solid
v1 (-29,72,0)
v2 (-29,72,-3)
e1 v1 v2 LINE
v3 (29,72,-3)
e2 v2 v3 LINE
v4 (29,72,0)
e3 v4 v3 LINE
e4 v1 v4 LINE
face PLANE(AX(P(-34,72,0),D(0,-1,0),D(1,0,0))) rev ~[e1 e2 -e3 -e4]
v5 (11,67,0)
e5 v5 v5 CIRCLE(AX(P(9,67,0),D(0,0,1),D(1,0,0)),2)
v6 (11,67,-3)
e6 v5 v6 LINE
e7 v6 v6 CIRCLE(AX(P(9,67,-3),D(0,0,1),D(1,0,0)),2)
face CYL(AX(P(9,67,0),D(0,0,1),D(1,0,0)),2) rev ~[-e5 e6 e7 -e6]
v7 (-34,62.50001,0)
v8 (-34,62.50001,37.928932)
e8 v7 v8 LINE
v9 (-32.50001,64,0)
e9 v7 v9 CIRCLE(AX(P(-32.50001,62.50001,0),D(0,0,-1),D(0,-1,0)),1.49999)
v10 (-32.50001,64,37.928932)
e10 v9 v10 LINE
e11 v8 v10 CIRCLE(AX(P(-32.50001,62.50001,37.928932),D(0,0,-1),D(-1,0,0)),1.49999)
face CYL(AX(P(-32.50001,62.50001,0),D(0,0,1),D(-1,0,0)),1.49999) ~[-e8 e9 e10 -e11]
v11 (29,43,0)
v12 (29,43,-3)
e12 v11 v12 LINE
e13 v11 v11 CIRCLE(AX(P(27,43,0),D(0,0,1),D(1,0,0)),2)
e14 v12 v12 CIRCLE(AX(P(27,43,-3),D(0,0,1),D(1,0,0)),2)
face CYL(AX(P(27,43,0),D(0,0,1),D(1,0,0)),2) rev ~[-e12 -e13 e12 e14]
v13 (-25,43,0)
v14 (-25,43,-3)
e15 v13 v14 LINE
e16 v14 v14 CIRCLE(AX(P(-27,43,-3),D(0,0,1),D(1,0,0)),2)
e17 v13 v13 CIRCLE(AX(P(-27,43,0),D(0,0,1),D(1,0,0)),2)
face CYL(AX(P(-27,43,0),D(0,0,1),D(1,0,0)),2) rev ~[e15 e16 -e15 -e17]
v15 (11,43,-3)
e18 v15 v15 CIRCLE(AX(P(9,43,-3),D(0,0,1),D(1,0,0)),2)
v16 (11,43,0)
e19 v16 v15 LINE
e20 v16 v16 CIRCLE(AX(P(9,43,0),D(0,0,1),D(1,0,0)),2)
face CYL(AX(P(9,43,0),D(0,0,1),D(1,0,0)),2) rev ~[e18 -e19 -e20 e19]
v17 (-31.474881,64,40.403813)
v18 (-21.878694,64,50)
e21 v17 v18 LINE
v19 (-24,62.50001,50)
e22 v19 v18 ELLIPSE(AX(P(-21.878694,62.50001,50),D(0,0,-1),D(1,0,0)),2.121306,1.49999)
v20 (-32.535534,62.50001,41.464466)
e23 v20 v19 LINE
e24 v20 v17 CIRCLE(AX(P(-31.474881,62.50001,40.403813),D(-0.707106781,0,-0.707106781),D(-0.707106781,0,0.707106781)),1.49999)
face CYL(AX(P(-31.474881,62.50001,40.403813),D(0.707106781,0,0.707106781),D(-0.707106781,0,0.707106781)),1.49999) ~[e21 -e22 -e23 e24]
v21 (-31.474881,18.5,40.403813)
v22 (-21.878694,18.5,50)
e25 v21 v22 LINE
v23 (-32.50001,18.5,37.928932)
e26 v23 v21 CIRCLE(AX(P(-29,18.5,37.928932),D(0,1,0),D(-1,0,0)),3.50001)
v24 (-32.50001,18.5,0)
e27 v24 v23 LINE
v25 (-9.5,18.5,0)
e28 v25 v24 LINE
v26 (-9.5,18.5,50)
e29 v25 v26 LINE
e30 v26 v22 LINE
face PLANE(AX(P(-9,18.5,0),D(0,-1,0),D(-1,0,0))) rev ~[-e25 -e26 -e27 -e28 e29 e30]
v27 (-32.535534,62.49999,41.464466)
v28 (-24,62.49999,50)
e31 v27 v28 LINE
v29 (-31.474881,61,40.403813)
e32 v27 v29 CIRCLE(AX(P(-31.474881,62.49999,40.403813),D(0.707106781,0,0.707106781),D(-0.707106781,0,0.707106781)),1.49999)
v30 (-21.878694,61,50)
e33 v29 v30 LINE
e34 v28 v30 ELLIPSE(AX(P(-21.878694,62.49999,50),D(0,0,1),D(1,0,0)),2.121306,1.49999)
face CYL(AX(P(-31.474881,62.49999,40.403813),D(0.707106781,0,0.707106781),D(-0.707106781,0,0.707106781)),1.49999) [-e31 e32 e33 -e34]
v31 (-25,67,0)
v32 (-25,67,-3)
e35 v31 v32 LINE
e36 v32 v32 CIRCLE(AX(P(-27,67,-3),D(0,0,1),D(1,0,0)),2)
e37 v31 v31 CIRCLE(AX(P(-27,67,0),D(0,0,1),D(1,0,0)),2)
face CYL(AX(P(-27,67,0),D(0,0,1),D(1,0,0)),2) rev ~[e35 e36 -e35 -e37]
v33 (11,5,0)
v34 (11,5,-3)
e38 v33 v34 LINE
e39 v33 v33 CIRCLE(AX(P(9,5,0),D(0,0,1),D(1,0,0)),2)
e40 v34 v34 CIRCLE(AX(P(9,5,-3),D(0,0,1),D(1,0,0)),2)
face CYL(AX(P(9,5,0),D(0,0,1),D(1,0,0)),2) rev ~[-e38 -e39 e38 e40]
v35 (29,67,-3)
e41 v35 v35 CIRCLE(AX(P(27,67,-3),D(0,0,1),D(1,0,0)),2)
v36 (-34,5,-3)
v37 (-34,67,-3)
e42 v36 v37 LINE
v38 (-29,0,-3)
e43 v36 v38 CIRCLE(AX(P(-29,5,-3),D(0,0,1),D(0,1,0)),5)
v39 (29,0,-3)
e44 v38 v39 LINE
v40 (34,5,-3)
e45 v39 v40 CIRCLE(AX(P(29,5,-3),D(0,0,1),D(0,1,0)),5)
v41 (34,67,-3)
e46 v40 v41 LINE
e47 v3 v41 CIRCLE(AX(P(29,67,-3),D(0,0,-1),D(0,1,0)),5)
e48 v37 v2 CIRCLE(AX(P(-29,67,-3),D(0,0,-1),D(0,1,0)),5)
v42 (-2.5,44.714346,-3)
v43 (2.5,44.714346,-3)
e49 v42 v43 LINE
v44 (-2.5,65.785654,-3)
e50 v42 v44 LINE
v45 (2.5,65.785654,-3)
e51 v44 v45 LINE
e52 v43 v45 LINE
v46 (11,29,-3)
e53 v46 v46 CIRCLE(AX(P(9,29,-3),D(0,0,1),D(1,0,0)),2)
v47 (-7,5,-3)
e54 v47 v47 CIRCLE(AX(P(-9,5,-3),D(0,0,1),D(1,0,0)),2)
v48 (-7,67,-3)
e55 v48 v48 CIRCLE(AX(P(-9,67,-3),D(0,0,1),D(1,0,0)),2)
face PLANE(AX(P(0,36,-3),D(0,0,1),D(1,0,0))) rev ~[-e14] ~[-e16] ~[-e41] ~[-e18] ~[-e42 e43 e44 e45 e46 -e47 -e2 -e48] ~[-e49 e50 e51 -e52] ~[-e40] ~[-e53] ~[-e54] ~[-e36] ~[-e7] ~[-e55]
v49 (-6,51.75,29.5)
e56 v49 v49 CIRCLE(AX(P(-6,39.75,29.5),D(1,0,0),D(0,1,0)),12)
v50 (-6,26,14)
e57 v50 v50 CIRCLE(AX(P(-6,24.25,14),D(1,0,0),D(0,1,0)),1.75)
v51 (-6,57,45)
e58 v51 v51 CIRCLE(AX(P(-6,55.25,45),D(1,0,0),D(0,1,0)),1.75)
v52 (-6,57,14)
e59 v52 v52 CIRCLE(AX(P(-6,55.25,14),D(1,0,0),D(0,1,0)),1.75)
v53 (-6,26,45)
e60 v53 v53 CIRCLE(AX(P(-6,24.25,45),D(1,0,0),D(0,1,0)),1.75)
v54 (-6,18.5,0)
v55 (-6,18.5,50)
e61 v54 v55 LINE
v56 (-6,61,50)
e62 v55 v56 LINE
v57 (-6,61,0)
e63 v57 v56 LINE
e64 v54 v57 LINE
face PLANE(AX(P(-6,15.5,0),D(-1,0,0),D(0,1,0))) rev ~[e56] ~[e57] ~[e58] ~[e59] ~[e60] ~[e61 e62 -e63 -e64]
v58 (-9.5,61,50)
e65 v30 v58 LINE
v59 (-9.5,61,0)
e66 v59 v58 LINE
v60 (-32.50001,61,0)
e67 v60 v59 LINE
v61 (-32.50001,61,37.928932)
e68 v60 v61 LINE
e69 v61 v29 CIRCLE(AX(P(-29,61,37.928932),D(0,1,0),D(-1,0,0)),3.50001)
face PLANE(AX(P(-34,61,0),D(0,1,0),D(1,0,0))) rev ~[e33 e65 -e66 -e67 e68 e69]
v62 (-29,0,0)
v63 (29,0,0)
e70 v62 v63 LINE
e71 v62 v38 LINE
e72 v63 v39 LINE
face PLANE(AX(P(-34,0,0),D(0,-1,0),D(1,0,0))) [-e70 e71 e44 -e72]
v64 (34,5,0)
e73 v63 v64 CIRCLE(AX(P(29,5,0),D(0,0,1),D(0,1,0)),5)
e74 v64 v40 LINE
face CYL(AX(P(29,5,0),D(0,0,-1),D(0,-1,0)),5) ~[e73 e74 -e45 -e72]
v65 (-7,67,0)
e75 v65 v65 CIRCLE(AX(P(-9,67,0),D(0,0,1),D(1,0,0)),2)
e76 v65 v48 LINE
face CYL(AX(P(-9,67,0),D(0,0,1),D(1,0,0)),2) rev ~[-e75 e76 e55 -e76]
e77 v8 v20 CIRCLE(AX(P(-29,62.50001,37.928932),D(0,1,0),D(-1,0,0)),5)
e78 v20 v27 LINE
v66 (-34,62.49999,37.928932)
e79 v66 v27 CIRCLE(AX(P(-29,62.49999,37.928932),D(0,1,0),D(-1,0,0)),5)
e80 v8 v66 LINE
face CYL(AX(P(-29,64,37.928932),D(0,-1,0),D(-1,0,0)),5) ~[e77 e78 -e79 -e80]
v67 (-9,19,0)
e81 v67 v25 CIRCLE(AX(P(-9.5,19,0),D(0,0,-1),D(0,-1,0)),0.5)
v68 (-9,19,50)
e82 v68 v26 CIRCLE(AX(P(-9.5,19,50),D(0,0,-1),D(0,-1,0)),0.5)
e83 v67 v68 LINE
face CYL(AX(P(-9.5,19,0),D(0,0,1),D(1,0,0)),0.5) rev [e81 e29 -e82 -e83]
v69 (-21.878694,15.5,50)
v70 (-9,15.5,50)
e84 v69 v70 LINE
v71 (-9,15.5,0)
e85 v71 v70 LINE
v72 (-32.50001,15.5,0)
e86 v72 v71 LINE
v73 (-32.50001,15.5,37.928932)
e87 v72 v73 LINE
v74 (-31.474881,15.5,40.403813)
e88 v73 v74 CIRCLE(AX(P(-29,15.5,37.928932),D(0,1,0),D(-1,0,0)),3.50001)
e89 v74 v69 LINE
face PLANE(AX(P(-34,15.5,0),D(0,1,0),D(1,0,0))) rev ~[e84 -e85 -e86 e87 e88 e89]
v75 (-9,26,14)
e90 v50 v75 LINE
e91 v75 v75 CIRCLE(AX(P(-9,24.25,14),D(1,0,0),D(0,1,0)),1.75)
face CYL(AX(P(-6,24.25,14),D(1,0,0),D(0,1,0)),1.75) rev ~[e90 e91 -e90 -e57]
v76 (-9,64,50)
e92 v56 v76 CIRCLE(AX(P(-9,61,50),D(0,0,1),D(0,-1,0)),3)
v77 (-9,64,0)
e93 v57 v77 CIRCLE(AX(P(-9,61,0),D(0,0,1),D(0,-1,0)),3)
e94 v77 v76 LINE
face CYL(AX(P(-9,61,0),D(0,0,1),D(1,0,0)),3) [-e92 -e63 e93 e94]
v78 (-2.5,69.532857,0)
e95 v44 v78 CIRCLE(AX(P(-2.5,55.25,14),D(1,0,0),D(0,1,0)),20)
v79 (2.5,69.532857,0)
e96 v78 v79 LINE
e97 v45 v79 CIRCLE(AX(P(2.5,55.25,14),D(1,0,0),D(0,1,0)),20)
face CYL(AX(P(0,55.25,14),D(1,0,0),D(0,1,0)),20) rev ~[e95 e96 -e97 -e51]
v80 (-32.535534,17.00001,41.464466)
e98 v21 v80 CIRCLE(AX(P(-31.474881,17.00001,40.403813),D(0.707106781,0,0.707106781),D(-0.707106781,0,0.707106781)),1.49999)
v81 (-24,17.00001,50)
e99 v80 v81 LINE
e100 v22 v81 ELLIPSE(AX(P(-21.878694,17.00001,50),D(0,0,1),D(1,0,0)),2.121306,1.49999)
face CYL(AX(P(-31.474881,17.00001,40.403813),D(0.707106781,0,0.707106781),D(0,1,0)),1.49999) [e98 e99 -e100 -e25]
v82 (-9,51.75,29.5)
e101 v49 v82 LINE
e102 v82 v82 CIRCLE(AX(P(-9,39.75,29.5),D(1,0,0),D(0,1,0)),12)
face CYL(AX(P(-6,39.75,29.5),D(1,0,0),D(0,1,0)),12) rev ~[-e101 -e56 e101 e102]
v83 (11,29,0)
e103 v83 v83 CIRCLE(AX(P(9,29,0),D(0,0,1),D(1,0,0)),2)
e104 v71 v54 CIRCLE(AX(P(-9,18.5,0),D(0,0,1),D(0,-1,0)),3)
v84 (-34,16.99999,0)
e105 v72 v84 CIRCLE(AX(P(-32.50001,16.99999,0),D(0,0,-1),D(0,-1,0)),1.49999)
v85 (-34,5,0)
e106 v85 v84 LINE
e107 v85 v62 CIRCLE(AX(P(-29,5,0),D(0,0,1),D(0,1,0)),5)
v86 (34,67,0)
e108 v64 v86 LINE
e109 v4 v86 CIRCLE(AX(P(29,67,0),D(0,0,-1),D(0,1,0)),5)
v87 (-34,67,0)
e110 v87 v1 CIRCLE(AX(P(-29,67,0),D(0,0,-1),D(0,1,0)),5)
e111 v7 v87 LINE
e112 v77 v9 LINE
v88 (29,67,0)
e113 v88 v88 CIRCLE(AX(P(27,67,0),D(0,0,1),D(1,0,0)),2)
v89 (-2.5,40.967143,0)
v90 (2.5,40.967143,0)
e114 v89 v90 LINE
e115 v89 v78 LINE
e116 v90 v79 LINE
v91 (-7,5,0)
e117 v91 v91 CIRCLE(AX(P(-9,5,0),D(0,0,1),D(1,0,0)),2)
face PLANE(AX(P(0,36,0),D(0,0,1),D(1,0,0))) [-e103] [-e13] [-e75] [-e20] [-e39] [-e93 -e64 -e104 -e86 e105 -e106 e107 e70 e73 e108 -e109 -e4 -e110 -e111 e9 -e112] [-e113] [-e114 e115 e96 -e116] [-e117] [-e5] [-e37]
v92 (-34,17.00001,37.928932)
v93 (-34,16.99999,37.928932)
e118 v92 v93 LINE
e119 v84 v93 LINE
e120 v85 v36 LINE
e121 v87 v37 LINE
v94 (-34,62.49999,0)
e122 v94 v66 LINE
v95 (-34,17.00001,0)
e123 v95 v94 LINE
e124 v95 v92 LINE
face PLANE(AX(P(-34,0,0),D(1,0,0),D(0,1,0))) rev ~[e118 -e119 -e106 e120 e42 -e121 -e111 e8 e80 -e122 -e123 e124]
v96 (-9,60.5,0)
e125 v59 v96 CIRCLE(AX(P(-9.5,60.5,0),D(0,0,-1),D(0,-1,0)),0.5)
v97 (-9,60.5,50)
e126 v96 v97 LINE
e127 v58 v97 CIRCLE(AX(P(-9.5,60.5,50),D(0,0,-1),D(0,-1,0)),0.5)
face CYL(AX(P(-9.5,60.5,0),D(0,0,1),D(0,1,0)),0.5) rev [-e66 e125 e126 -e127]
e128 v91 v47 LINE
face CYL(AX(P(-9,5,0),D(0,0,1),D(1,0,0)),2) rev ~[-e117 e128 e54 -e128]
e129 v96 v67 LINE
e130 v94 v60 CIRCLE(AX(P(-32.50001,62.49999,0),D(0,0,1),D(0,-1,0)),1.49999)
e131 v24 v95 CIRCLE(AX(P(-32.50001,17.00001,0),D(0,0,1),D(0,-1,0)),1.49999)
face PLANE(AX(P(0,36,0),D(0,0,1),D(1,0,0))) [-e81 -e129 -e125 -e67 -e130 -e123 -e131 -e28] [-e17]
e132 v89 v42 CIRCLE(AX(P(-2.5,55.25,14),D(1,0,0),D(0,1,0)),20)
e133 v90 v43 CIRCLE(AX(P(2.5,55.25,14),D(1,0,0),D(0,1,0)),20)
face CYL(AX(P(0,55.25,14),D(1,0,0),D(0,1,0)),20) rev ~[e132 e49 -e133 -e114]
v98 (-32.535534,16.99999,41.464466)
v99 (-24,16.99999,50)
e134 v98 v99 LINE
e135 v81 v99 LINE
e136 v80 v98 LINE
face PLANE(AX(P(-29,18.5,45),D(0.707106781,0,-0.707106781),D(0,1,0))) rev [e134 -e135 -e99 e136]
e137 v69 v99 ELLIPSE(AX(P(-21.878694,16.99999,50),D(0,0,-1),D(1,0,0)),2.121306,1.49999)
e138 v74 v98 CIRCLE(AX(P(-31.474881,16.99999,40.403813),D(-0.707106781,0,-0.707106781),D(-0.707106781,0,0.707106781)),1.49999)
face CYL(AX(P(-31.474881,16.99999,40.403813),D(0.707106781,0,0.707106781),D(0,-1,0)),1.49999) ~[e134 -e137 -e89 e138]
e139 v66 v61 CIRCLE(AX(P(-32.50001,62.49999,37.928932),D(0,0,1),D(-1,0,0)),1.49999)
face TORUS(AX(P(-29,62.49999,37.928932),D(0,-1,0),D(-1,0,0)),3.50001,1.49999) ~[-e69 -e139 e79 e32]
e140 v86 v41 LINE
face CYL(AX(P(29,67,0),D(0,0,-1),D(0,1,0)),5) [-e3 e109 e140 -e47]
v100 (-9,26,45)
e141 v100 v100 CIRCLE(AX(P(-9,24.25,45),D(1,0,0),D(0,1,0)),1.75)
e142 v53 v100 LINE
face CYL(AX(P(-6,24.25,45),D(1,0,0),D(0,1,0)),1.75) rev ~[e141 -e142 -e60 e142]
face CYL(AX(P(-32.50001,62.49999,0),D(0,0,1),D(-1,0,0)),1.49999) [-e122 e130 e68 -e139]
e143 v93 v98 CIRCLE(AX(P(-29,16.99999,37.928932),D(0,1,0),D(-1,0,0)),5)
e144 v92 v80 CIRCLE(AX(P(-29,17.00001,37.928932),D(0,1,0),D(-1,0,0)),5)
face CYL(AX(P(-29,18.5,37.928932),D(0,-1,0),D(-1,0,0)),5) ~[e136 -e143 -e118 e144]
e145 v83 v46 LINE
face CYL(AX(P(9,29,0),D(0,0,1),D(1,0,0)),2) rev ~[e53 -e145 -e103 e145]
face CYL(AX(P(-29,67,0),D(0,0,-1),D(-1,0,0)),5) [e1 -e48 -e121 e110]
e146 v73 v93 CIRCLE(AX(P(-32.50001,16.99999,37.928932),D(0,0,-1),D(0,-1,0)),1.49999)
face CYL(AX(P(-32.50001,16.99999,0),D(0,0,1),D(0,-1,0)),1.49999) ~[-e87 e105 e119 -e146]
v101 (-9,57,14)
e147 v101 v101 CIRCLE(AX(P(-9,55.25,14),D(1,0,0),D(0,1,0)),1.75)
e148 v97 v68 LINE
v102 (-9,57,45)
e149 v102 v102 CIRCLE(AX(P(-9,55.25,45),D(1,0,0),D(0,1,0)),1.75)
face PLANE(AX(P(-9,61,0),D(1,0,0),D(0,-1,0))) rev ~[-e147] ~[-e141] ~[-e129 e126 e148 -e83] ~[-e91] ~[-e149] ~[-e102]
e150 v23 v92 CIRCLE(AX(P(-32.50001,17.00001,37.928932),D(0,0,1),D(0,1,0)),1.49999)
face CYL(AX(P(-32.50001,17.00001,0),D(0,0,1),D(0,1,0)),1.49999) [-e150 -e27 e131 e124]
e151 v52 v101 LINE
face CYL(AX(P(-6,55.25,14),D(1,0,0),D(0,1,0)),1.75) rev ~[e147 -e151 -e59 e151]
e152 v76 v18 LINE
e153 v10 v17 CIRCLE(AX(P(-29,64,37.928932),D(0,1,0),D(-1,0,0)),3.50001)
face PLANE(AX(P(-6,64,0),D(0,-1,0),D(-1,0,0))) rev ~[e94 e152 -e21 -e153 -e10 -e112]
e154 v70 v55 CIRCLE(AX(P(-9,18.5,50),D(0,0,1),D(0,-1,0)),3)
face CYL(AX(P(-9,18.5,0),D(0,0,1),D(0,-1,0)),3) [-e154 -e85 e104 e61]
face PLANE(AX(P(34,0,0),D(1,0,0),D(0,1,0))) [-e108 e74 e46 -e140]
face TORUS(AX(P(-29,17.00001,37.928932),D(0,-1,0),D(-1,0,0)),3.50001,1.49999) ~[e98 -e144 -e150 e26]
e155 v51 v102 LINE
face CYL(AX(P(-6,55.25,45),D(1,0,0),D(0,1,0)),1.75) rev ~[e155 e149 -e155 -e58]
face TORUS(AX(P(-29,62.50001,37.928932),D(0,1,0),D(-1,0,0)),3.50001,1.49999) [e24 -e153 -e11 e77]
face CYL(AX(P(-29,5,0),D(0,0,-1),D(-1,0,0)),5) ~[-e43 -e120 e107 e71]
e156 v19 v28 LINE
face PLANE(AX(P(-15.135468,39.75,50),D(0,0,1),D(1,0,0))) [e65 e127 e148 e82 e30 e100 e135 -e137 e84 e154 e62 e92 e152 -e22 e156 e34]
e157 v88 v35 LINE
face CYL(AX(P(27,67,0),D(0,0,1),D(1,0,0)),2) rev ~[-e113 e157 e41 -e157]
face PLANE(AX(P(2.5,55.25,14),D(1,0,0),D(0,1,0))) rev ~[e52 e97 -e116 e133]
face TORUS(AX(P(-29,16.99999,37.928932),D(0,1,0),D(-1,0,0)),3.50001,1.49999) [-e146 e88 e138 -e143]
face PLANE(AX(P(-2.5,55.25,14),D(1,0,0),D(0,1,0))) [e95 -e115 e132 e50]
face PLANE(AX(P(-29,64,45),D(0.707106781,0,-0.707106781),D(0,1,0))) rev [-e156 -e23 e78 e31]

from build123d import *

# Parameters (mm, degrees)
F0_W      = 68
F0_H      = 72
F0_R      = 2
F1_DEPTH  = 3
F3_DEPTH  = 50
F4_SIZE   = 10
F6_R      = 1.75
F6_R_2    = 12
F7_DEPTH  = 25
F8_R      = 5
F9_R      = 1.49999
F10_R     = 3
F11_R     = 0.5
F13_R     = 20
F13_R_2   = 1.75
F14_DEPTH = 2.5


# Not quite as in the source:
# - a fillet or chamfer is up to 0.001 mm smaller than in the source, because OpenCascade refuses the exact size


with BuildPart() as f1:
    # F0 (on Top) → F1 (new body)
    with BuildSketch(Plane.XY):
        with Locations((0, 36)):
            Rectangle(F0_W, F0_H)
        with Locations((-9, 5)):
            Circle(F0_R, mode=Mode.SUBTRACT)
        with Locations((-9, 29)):
            Circle(F0_R, mode=Mode.SUBTRACT)
        with Locations((9, 5)):
            Circle(F0_R, mode=Mode.SUBTRACT)
        with Locations((9, 29)):
            Circle(F0_R, mode=Mode.SUBTRACT)
        with Locations((-27, 43)):
            Circle(F0_R, mode=Mode.SUBTRACT)
        with Locations((-9, 43)):
            Circle(F0_R, mode=Mode.SUBTRACT)
        with Locations((-27, 67)):
            Circle(F0_R, mode=Mode.SUBTRACT)
        with Locations((-9, 67)):
            Circle(F0_R, mode=Mode.SUBTRACT)
        with Locations((9, 43)):
            Circle(F0_R, mode=Mode.SUBTRACT)
        with Locations((27, 43)):
            Circle(F0_R, mode=Mode.SUBTRACT)
        with Locations((9, 67)):
            Circle(F0_R, mode=Mode.SUBTRACT)
        with Locations((27, 67)):
            Circle(F0_R, mode=Mode.SUBTRACT)
        with Locations((-9, 43)):
            Circle(F0_R)
        with Locations((-9, 29)):
            Circle(F0_R)
    extrude(amount=-F1_DEPTH)

    # F2 (on Top) → F3 (join)
    with BuildSketch(Plane.XY):
        Polygon((-6, 64), (-34, 64), (-34, 61), (-9, 61), (-9, 18.5), (-34, 18.5), (-34, 15.5), (-6, 15.5), align=None)
    extrude(amount=F3_DEPTH)

    # F4
    f4_edges = [f1.edges().sort_by_distance(p)[0] for p in [
        (-34, 62.5, 50),
        (-34, 17, 50),
    ]]
    chamfer(f4_edges, length=F4_SIZE)

    # F6 (on face) → F7 (cut)
    with BuildSketch(Plane.YZ.offset(-6)):
        with Locations((55.25, 45)):
            Circle(F6_R)
        with Locations((39.75, 29.5)):
            Circle(F6_R_2)
        with Locations((55.25, 14)):
            Circle(F6_R)
        with Locations((24.25, 45)):
            Circle(F6_R)
        with Locations((24.25, 14)):
            Circle(F6_R)
    extrude(amount=-F7_DEPTH, mode=Mode.SUBTRACT)

    # F8
    f8_edges = [f1.edges().sort_by_distance(p)[0] for p in [
        (-34, 72, -1.5),
        (34, 72, -1.5),
        (34, 0, -1.5),
        (-34, 0, -1.5),
        (-34, 17, 40),
        (-34, 62.5, 40),
    ]]
    fillet(f8_edges, radius=F8_R)

    # F9 (radius 1.5 in the source; OpenCascade refuses exactly that, so slightly less here)
    f9_edges = [f1.edges().sort_by_distance(p)[0] for p in [
        (-34, 64, 18.964466),
        (-34, 61, 18.964466),
        (-28.267767, 15.5, 45.732233),
        (-28.267767, 18.5, 45.732233),
        (-33.619398, 15.5, 39.842349),
        (-34, 15.5, 18.964466),
        (-34, 18.5, 18.964466),
        (-33.619398, 18.5, 39.842349),
        (-33.619398, 64, 39.842349),
        (-33.619398, 61, 39.842349),
        (-28.267767, 61, 45.732233),
        (-28.267767, 64, 45.732233),
    ]]
    fillet(f9_edges, radius=F9_R)

    # F10
    f10_edges = [f1.edges().sort_by_distance(p)[0] for p in [
        (-6, 15.5, 25),
        (-6, 64, 25),
    ]]
    fillet(f10_edges, radius=F10_R)

    # F11
    f11_edges = [f1.edges().sort_by_distance(p)[0] for p in [
        (-9, 18.5, 25),
        (-9, 61, 25),
    ]]
    fillet(f11_edges, radius=F11_R)

    # F13 (on offset) → F14 (cut, symmetric)
    with BuildSketch(Plane.YZ):
        with Locations((55.25, 14)):
            Circle(F13_R)
        with Locations((55.25, 14)):
            Circle(F13_R_2, mode=Mode.SUBTRACT)
    extrude(amount=F14_DEPTH, both=True, mode=Mode.SUBTRACT)


solid = f1.part
